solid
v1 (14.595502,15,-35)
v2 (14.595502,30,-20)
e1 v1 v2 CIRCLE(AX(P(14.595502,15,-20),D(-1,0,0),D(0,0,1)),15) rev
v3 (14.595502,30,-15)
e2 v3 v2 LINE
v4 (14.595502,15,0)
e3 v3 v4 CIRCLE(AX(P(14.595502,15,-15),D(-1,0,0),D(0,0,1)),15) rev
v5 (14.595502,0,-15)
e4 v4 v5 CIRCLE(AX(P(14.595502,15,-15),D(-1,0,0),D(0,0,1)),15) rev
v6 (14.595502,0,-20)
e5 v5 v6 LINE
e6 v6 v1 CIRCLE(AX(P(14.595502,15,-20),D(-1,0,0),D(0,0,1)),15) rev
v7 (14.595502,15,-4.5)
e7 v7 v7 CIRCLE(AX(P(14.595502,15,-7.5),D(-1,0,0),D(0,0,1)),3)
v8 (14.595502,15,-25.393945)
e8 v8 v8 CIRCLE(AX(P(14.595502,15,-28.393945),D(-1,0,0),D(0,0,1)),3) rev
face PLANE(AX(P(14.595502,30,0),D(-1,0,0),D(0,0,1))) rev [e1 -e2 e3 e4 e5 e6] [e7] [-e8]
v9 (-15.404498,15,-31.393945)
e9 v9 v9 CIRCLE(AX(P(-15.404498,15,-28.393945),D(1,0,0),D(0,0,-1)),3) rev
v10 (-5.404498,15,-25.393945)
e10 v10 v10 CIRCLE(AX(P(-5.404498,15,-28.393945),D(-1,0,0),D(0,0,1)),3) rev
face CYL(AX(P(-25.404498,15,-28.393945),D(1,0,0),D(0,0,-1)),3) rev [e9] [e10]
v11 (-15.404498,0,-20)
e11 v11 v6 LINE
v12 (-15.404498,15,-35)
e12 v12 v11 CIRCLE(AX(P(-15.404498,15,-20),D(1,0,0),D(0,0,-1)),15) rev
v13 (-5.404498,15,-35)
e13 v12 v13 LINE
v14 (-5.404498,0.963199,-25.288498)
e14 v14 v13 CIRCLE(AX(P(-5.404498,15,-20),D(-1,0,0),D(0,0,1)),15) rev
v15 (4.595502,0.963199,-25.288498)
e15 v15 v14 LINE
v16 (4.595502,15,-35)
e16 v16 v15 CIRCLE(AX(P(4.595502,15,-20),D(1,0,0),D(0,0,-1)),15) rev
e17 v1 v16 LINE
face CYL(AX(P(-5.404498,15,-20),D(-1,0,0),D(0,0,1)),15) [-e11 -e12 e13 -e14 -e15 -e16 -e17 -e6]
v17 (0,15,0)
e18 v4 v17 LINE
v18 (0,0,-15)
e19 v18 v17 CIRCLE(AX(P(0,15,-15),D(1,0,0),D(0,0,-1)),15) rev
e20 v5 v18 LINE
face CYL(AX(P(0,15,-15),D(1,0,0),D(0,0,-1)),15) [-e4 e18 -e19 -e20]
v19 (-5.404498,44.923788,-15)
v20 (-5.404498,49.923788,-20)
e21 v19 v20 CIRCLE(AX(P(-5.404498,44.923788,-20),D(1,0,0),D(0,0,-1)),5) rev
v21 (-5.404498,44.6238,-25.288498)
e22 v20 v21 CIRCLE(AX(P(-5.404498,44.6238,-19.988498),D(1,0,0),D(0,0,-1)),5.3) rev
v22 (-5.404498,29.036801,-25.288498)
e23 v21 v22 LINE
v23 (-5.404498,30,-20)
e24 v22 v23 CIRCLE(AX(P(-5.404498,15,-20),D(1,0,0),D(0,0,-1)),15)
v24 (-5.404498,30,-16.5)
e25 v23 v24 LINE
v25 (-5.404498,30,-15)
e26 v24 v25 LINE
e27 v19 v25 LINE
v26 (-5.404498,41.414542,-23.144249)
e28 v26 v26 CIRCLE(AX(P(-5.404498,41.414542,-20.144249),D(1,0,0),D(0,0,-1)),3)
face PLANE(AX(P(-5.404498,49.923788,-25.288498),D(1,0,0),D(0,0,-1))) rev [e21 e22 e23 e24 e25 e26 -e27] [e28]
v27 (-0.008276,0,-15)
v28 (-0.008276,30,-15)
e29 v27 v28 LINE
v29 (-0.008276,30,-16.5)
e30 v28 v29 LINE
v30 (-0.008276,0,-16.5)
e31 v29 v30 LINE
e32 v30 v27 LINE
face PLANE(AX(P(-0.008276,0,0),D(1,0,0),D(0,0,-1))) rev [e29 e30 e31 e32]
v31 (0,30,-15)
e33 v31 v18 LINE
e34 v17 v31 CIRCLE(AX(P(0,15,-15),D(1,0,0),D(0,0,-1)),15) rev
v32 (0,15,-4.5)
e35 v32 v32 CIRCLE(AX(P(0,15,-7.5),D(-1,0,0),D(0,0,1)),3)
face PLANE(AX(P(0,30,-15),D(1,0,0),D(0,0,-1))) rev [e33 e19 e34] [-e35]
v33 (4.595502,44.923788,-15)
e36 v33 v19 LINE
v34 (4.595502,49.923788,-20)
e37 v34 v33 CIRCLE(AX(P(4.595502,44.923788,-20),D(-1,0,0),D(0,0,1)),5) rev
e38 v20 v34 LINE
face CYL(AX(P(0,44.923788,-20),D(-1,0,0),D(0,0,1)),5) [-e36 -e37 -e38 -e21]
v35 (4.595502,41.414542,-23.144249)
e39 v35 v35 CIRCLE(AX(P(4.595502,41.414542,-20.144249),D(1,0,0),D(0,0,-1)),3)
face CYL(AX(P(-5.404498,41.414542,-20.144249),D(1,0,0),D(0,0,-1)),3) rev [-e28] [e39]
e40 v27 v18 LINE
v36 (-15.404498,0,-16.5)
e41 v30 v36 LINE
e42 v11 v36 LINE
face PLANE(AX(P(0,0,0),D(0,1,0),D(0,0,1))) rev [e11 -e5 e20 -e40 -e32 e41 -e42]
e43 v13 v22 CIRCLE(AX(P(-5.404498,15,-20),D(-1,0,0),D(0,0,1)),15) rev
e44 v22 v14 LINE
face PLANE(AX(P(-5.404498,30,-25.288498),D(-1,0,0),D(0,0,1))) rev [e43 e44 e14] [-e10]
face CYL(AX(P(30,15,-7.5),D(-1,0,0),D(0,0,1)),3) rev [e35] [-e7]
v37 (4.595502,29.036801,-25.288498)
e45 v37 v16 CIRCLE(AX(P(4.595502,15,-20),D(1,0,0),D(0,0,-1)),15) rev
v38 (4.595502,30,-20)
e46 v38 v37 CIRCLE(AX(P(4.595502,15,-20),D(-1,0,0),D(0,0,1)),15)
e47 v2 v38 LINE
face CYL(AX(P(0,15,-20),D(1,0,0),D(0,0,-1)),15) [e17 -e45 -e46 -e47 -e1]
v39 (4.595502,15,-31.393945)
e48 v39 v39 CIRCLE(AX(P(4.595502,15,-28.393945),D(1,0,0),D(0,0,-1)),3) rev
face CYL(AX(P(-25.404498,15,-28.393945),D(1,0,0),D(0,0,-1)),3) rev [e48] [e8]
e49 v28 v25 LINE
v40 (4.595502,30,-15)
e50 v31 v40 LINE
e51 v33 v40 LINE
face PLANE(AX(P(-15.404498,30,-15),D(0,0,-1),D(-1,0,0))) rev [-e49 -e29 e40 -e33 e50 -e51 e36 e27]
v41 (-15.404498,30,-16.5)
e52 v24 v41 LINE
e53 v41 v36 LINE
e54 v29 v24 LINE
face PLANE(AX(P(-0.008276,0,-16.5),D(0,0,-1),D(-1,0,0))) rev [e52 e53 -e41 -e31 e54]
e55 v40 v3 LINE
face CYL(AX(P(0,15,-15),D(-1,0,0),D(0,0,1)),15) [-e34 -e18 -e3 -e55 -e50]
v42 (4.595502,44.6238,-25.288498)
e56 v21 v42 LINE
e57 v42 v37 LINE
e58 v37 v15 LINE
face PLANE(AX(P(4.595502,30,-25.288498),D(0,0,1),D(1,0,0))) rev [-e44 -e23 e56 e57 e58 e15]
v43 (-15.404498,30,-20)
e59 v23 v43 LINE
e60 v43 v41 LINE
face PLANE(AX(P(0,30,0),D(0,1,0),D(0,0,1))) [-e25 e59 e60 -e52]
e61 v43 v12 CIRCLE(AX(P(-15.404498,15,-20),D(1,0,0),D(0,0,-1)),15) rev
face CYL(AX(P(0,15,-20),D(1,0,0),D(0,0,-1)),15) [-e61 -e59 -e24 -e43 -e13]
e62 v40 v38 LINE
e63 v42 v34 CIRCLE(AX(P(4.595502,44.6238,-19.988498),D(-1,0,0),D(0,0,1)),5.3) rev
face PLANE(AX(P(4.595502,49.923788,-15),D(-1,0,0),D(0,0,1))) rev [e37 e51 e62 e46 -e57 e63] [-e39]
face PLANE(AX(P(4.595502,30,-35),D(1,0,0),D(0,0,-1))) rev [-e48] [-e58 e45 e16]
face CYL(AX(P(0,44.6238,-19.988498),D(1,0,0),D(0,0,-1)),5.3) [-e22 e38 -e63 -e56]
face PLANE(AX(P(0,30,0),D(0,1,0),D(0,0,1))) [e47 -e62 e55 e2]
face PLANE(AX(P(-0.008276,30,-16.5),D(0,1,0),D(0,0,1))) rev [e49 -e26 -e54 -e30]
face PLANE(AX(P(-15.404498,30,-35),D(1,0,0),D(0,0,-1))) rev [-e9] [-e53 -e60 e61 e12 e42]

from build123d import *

# Parameters (mm, degrees)
BOSS_EXTRUDE2_DEPTH     = 30
SKETCH3_R               = 3
CUT_EXTRUDE1_DEPTH      = 30
FILLET7_R               = 15
FILLET8_R               = 15
CUT_EXTRUDE2_DEPTH      = 30
CUT_EXTRUDE2_DEPTH_BACK = 30
SKETCH6_R               = 3
SKETCH7_W               = 10
SKETCH7_H               = 10.288497565
BOSS_EXTRUDE3_DEPTH     = 19.923787886
SKETCH8_R               = 3
CUT_EXTRUDE3_DEPTH      = 10
FILLET12_R              = 5
FILLET15_R              = 5.3
FILLET17_R              = 15
SKETCH9_W               = 1.5
SKETCH9_H               = 30
CUT_EXTRUDE4_DEPTH      = 15.39622199


# Some blends are built 0.0001 mm under size
with BuildPart() as part:
    # Sketch2 → Boss-Extrude2 (new body)
    with BuildSketch(Plane(origin=(0, 0, 0), x_dir=(1, 0, 0), z_dir=(0, 1, 0))):
        Polygon((0, 0), (14.595501533, 0), (14.595501533, 35), (4.595501533, 35), (4.595501533, 25.288497565), (-5.404498467, 25.288497565), (-5.404498467, 35), (-15.404498467, 35), (-15.404498467, 15), (0, 15), align=None)
    extrude(amount=BOSS_EXTRUDE2_DEPTH)

    # Sketch3 → Cut-Extrude1 (cut)
    with BuildSketch(Plane.ZY):
        with Locations((-7.5, 15)):
            Circle(SKETCH3_R)
    extrude(amount=-CUT_EXTRUDE1_DEPTH, mode=Mode.SUBTRACT)

    # Fillet7
    fillet7_edges = [part.edges().sort_by_distance(p)[0] for p in [
        (7.297750767, 30, 0),
    ]]
    fillet(fillet7_edges, radius=FILLET7_R)

    # Fillet8
    fillet8_edges = [part.edges().sort_by_distance(p)[0] for p in [
        (7.297750767, 0, 0),
    ]]
    fillet(fillet8_edges, radius=FILLET8_R - 0.0001)  # a hair under: the kernel refuses the full size

    # Sketch6 → Cut-Extrude2 (cut, two sides: drawn at the far end of the back side and taken through both)
    with BuildSketch(Plane.ZY.offset(-4.595501533).offset(-CUT_EXTRUDE2_DEPTH_BACK)):
        with Locations(Location((-28.393945452, 15, 0), (0, 0, 180))):
            Circle(SKETCH6_R)
    extrude(amount=CUT_EXTRUDE2_DEPTH + CUT_EXTRUDE2_DEPTH_BACK, mode=Mode.SUBTRACT)

    # Sketch7 → Boss-Extrude3 (add)
    with BuildSketch(Plane(origin=(0, 30, 0), x_dir=(1, 0, 0), z_dir=(0, 1, 0))):
        with Locations((-0.404498467, 20.144248783)):
            Rectangle(SKETCH7_W, SKETCH7_H)
    extrude(amount=BOSS_EXTRUDE3_DEPTH)

    # Sketch8 → Cut-Extrude3 (cut)
    with BuildSketch(Plane(origin=(4.595501533, 0, 0), x_dir=(0, 0, -1), z_dir=(1, 0, 0))):
        with Locations((20.144248782, 41.414541631)):
            Circle(SKETCH8_R)
    extrude(amount=-CUT_EXTRUDE3_DEPTH, mode=Mode.SUBTRACT)

    # Fillet12
    fillet12_edges = [part.edges().sort_by_distance(p)[0] for p in [
        (-0.404498467, 49.923787886, -15),
    ]]
    fillet(fillet12_edges, radius=FILLET12_R)

    # Fillet15
    # the kernel refuses this fillet: 5.3 mm, written as the material it takes off along each edge
    with BuildSketch(Plane(origin=(17.845501533, 49.923787886, -25.288497565), x_dir=(0, 0, 1), z_dir=(-1, 0, 0))) as fillet15_piece_1:
        with BuildLine():
            CenterArc((FILLET15_R, -FILLET15_R), FILLET15_R, 90, 90)
            Line((0, -FILLET15_R), (-FILLET15_R * 0.02, -FILLET15_R))
            Line((-FILLET15_R * 0.02, -FILLET15_R), (-FILLET15_R * 0.02, FILLET15_R * 0.02))
            Line((-FILLET15_R * 0.02, FILLET15_R * 0.02), (FILLET15_R, FILLET15_R * 0.02))
            Line((FILLET15_R, FILLET15_R * 0.02), (FILLET15_R, 0))
        make_face()
    extrude(amount=36.5, mode=Mode.SUBTRACT)

    # Fillet17
    # the kernel refuses this fillet: 15 mm, written as the material it takes off along each edge
    with BuildSketch(Plane(origin=(52.095501533, 30, -35), x_dir=(0, 0, 1), z_dir=(-1, 0, 0)), Plane(origin=(-5.404498467, 30, -35), x_dir=(0, 0, 1), z_dir=(-1, 0, 0))) as fillet17_piece_1:
        with BuildLine():
            CenterArc((FILLET17_R, -FILLET17_R), FILLET17_R, 90, 90)
            Line((0, -FILLET17_R), (0, 0))
            Line((0, 0), (FILLET17_R, 0))
        make_face()
    extrude(amount=47.5, mode=Mode.SUBTRACT)
    with BuildSketch(Plane(origin=(52.095501533, 30, -35), x_dir=(0, 0, 1), z_dir=(-1, 0, 0))) as fillet17_piece_2_section:
        with BuildLine():
            CenterArc((FILLET17_R, -FILLET17_R), FILLET17_R, 90, 90)
            Line((0, -FILLET17_R), (0, 0))
            Line((0, 0), (FILLET17_R, 0))
        make_face()
    fillet17_piece_2 = extrude(amount=85, mode=Mode.PRIVATE)
    fillet17_piece_2 = split(fillet17_piece_2, bisect_by=Plane(origin=(-5.404498467, 29.712703536, -23.975011992), z_dir=(-1, 0, 0)), keep=Keep.TOP, mode=Mode.PRIVATE)
    add(fillet17_piece_2, mode=Mode.SUBTRACT)
    with BuildSketch(Plane(origin=(32.095501533, 0, -35), x_dir=(0, 0, 1), z_dir=(-1, 0, 0))) as fillet17_piece_3:
        with BuildLine():
            CenterArc((FILLET17_R, FILLET17_R), FILLET17_R, 180, 90)
            Line((0, FILLET17_R), (0, 0))
            Line((0, 0), (FILLET17_R, 0))
        make_face()
    extrude(amount=85, mode=Mode.SUBTRACT)
    with BuildSketch(Plane(origin=(32.095501533, 30, -35), x_dir=(0, 0, 1), z_dir=(-1, 0, 0))) as fillet17_piece_4_section:
        with BuildLine():
            CenterArc((FILLET17_R, -FILLET17_R), FILLET17_R, 90, 90)
            Line((0, -FILLET17_R), (0, 0))
            Line((0, 0), (FILLET17_R, 0))
        make_face()
    fillet17_piece_4 = extrude(amount=85, mode=Mode.PRIVATE)
    fillet17_piece_4 = split(fillet17_piece_4, bisect_by=Plane(origin=(4.595501533, 29.712703536, -23.975011992), z_dir=(1, 0, 0)), keep=Keep.TOP, mode=Mode.PRIVATE)
    add(fillet17_piece_4, mode=Mode.SUBTRACT)

    # Sketch9 → Cut-Extrude4 (cut)
    with BuildSketch(Plane.ZY.offset(15.404498467)):
        with Locations((-15.75, 15)):
            Rectangle(SKETCH9_W, SKETCH9_H)
    extrude(amount=-CUT_EXTRUDE4_DEPTH, mode=Mode.SUBTRACT)


solid = part.part
